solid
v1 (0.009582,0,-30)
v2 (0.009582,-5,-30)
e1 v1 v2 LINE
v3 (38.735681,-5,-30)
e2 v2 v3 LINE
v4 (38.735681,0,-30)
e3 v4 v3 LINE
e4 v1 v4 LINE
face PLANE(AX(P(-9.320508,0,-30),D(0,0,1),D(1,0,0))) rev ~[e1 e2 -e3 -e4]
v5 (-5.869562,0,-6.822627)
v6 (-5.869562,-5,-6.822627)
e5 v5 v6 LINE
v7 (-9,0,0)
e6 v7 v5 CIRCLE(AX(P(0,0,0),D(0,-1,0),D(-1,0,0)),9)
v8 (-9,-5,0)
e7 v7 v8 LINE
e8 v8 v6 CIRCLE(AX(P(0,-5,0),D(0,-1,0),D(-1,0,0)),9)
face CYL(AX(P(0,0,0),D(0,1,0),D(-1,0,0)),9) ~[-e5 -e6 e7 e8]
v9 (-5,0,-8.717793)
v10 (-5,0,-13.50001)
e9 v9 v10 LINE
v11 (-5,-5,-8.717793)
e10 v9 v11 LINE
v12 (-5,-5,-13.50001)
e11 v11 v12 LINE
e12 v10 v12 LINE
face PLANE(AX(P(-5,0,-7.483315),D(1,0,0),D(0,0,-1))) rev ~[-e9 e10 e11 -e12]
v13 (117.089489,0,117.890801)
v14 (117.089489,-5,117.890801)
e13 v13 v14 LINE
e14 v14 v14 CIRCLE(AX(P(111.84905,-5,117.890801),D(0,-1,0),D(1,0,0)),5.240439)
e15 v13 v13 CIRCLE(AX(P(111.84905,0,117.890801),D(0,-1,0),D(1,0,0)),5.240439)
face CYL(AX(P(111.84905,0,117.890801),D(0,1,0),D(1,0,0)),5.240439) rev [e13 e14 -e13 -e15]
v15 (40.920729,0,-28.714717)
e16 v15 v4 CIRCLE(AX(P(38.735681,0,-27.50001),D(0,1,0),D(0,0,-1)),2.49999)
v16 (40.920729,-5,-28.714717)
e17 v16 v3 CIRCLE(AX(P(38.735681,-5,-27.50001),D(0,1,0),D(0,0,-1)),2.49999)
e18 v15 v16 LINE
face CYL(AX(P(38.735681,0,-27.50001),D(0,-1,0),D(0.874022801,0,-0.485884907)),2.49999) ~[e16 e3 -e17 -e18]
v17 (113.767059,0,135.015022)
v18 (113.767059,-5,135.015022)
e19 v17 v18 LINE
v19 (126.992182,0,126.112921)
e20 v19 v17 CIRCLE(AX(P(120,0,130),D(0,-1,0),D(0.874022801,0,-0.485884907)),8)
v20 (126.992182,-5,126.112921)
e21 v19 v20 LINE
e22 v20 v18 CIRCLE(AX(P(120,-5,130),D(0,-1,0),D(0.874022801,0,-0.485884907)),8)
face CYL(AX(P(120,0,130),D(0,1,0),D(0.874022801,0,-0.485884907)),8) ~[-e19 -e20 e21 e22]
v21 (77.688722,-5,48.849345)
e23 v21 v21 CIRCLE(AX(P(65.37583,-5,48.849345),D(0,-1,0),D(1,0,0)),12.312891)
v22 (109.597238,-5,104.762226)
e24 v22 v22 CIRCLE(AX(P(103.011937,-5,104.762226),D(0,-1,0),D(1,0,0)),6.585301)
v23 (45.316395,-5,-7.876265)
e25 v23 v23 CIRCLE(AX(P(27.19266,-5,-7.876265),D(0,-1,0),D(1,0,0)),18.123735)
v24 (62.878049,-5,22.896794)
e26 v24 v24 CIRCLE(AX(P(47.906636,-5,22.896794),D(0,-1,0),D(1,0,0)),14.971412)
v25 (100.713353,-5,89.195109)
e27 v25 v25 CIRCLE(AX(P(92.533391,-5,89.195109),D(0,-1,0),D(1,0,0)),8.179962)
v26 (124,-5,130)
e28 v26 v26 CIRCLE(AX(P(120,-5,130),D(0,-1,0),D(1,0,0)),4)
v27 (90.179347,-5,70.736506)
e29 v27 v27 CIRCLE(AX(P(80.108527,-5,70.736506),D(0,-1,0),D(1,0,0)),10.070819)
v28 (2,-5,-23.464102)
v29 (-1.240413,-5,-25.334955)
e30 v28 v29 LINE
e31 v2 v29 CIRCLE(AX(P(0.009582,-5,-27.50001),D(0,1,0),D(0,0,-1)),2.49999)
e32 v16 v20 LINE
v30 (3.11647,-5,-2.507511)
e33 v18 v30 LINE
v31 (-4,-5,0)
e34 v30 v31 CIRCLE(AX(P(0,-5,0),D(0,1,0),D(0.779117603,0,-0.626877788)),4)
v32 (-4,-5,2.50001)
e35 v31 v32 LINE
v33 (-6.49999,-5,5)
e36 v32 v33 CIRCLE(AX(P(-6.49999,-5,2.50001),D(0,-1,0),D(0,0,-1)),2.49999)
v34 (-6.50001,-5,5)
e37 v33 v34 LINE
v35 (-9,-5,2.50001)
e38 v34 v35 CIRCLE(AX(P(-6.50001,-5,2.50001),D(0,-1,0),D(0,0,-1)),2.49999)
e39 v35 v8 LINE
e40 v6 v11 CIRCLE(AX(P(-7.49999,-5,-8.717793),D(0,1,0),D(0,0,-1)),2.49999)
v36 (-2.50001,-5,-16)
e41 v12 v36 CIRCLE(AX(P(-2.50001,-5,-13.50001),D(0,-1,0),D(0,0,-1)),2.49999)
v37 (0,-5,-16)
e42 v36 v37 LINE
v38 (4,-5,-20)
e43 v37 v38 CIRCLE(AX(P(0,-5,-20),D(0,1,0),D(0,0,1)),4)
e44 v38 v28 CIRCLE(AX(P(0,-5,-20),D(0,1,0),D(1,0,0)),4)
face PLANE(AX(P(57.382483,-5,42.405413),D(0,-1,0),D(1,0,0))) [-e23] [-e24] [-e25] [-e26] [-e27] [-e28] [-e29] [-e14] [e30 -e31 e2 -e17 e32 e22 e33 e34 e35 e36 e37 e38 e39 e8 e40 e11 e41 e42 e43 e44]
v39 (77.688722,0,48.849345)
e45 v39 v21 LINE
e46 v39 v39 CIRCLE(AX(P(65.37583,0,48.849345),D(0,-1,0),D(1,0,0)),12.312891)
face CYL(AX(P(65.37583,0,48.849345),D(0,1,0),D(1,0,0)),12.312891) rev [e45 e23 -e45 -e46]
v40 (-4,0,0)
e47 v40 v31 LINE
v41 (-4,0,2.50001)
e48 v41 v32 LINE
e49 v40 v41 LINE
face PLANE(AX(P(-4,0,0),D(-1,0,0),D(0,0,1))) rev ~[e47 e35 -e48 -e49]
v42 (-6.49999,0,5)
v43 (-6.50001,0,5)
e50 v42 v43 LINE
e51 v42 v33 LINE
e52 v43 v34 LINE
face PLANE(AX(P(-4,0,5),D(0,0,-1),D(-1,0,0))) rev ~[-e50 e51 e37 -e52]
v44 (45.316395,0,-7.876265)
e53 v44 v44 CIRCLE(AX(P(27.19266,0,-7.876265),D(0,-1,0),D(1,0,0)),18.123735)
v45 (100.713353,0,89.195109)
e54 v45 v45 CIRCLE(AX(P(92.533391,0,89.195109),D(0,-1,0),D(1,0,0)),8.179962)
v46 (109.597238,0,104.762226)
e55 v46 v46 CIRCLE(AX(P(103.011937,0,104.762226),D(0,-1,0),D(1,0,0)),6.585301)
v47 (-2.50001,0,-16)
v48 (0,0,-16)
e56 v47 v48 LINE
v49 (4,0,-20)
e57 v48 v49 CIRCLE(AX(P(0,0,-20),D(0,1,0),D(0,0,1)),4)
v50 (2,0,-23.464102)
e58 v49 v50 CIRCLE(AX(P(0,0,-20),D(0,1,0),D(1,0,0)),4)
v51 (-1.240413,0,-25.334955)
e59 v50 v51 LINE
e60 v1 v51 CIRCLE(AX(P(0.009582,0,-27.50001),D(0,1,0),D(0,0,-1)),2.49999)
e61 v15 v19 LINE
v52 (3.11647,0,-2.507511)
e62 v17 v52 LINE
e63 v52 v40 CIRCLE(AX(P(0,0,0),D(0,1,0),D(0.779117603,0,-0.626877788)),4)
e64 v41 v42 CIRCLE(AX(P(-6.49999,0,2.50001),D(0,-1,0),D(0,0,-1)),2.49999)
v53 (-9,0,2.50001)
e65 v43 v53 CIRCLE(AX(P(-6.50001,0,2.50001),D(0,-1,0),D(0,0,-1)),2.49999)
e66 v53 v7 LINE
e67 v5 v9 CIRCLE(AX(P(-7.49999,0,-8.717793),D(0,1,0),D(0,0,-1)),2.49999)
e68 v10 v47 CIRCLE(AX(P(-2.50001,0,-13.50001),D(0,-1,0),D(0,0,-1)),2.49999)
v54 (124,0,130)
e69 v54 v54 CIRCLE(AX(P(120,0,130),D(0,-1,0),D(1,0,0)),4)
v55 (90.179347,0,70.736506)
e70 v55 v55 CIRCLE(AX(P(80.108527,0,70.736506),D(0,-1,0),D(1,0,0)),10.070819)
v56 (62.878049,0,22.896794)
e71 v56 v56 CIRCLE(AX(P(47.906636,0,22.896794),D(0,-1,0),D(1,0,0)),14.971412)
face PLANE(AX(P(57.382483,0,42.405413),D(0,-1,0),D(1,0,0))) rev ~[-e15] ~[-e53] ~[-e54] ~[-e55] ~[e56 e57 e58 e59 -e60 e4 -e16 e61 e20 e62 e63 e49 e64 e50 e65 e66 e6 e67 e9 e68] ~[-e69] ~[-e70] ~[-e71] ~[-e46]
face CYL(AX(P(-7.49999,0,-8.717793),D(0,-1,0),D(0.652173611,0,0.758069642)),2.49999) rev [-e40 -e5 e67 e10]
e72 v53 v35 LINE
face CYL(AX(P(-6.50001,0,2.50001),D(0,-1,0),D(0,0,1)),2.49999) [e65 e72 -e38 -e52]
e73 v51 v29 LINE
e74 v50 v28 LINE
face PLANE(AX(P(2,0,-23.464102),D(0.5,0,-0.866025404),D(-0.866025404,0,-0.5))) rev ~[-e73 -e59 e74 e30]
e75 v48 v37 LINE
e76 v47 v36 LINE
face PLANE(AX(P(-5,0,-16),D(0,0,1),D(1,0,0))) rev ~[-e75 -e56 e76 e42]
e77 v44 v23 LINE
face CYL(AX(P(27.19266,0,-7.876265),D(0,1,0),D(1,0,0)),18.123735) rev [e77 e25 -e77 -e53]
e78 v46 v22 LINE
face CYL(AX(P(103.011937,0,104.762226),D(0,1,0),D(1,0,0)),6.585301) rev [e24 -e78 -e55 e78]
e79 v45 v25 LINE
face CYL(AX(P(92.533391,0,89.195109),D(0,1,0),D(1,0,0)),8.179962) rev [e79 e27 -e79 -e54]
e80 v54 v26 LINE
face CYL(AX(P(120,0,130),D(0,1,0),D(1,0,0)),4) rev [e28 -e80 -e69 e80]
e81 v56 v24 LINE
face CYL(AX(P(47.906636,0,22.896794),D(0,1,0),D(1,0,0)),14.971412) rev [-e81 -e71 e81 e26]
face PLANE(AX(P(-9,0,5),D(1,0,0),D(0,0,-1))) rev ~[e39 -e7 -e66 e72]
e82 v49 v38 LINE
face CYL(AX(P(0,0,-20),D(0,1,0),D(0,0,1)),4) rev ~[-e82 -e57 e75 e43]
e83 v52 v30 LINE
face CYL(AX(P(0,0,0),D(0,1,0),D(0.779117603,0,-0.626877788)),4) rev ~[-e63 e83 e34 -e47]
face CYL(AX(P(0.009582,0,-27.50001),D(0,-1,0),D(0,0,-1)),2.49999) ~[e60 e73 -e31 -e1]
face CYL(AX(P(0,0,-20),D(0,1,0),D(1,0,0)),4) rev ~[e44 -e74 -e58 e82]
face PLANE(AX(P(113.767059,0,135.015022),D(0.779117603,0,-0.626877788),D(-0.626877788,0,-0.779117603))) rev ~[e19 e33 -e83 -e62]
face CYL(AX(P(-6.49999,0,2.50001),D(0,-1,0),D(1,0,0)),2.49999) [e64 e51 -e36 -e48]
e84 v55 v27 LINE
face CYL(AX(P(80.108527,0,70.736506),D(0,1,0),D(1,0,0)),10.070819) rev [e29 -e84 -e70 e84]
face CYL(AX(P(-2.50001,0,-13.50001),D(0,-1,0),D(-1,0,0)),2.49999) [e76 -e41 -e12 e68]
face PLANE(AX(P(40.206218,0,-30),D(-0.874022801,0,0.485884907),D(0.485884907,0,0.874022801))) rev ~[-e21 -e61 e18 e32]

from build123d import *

# Parameters (mm, degrees)
F0_R     = 18.1237353156
F0_R_2   = 14.9714122035
F0_R_3   = 12.3128911041
F0_R_4   = 10.0708194052
F0_R_5   = 8.1799615502
F0_R_6   = 6.5853009382
F0_R_7   = 5.2404391544
F0_R_8   = 4
F1_DEPTH = 5
F2_R     = 2.49999


# Not quite as in the source:
# - a fillet or chamfer is up to 0.001 mm smaller than in the source, because OpenCascade refuses the exact size


with BuildPart() as f1:
    # F0 (on Front) → F1 (new body)
    with BuildSketch(Plane.XZ):
        with BuildLine():
            ThreePointArc((3.1164704126, -2.5075111501), (-1.3293077803, -3.7726569981), (-4, 0))
            Line((-4, 0), (-4, 5))
            Line((-4, 5), (-9, 5))
            Line((-9, 5), (-9, 0))
            ThreePointArc((-9, 0), (-7.9372539332, -4.2426406871), (-5, -7.4833147735))
            Line((-5, -7.4833147735), (-5, -16))
            Line((-5, -16), (0, -16))
            ThreePointArc((0, -16), (2.8284271247, -17.1715728753), (4, -20))
            ThreePointArc((4, -20), (3.4641016151, -22), (2, -23.4641016151))
            Line((2, -23.4641016151), (-9.3205080757, -30))
            Line((-9.3205080757, -30), (40.2062176005, -30))
            Line((40.2062176005, -30), (126.9921824081, 126.1129207402))
            ThreePointArc((126.9921824081, 126.1129207402), (124.4672099784, 136.6365680143), (113.7670591749, 135.0150223001))
            Line((113.7670591749, 135.0150223001), (3.1164704126, -2.5075111501))
        make_face()
        with Locations((27.1926598128, -7.8762646844)):
            Circle(F0_R, mode=Mode.SUBTRACT)
        with Locations((47.9066364562, 22.8967940046)):
            Circle(F0_R_2, mode=Mode.SUBTRACT)
        with Locations((65.375830444, 48.8493448398)):
            Circle(F0_R_3, mode=Mode.SUBTRACT)
        with Locations((80.1085273008, 70.736505998)):
            Circle(F0_R_4, mode=Mode.SUBTRACT)
        with Locations((92.5333911397, 89.1951086458)):
            Circle(F0_R_5, mode=Mode.SUBTRACT)
        with Locations((103.0119371191, 104.7622262472)):
            Circle(F0_R_6, mode=Mode.SUBTRACT)
        with Locations((111.8490501262, 117.8908013099)):
            Circle(F0_R_7, mode=Mode.SUBTRACT)
        with Locations((120, 130)):
            Circle(F0_R_8, mode=Mode.SUBTRACT)
    extrude(amount=F1_DEPTH)

    # F2 (radius 2.5 in the source; OpenCascade refuses exactly that, so slightly less here)
    f2_edges = [f1.edges().sort_by_distance(p)[0] for p in [
        (-9, -2.5, 5),
        (-4, -2.5, 5),
        (-9.320508, -2.5, -30),
        (40.206218, -2.5, -30),
        (-5, -2.5, -7.483315),
        (-5, -2.5, -16),
    ]]
    fillet(f2_edges, radius=F2_R)


solid = f1.part
